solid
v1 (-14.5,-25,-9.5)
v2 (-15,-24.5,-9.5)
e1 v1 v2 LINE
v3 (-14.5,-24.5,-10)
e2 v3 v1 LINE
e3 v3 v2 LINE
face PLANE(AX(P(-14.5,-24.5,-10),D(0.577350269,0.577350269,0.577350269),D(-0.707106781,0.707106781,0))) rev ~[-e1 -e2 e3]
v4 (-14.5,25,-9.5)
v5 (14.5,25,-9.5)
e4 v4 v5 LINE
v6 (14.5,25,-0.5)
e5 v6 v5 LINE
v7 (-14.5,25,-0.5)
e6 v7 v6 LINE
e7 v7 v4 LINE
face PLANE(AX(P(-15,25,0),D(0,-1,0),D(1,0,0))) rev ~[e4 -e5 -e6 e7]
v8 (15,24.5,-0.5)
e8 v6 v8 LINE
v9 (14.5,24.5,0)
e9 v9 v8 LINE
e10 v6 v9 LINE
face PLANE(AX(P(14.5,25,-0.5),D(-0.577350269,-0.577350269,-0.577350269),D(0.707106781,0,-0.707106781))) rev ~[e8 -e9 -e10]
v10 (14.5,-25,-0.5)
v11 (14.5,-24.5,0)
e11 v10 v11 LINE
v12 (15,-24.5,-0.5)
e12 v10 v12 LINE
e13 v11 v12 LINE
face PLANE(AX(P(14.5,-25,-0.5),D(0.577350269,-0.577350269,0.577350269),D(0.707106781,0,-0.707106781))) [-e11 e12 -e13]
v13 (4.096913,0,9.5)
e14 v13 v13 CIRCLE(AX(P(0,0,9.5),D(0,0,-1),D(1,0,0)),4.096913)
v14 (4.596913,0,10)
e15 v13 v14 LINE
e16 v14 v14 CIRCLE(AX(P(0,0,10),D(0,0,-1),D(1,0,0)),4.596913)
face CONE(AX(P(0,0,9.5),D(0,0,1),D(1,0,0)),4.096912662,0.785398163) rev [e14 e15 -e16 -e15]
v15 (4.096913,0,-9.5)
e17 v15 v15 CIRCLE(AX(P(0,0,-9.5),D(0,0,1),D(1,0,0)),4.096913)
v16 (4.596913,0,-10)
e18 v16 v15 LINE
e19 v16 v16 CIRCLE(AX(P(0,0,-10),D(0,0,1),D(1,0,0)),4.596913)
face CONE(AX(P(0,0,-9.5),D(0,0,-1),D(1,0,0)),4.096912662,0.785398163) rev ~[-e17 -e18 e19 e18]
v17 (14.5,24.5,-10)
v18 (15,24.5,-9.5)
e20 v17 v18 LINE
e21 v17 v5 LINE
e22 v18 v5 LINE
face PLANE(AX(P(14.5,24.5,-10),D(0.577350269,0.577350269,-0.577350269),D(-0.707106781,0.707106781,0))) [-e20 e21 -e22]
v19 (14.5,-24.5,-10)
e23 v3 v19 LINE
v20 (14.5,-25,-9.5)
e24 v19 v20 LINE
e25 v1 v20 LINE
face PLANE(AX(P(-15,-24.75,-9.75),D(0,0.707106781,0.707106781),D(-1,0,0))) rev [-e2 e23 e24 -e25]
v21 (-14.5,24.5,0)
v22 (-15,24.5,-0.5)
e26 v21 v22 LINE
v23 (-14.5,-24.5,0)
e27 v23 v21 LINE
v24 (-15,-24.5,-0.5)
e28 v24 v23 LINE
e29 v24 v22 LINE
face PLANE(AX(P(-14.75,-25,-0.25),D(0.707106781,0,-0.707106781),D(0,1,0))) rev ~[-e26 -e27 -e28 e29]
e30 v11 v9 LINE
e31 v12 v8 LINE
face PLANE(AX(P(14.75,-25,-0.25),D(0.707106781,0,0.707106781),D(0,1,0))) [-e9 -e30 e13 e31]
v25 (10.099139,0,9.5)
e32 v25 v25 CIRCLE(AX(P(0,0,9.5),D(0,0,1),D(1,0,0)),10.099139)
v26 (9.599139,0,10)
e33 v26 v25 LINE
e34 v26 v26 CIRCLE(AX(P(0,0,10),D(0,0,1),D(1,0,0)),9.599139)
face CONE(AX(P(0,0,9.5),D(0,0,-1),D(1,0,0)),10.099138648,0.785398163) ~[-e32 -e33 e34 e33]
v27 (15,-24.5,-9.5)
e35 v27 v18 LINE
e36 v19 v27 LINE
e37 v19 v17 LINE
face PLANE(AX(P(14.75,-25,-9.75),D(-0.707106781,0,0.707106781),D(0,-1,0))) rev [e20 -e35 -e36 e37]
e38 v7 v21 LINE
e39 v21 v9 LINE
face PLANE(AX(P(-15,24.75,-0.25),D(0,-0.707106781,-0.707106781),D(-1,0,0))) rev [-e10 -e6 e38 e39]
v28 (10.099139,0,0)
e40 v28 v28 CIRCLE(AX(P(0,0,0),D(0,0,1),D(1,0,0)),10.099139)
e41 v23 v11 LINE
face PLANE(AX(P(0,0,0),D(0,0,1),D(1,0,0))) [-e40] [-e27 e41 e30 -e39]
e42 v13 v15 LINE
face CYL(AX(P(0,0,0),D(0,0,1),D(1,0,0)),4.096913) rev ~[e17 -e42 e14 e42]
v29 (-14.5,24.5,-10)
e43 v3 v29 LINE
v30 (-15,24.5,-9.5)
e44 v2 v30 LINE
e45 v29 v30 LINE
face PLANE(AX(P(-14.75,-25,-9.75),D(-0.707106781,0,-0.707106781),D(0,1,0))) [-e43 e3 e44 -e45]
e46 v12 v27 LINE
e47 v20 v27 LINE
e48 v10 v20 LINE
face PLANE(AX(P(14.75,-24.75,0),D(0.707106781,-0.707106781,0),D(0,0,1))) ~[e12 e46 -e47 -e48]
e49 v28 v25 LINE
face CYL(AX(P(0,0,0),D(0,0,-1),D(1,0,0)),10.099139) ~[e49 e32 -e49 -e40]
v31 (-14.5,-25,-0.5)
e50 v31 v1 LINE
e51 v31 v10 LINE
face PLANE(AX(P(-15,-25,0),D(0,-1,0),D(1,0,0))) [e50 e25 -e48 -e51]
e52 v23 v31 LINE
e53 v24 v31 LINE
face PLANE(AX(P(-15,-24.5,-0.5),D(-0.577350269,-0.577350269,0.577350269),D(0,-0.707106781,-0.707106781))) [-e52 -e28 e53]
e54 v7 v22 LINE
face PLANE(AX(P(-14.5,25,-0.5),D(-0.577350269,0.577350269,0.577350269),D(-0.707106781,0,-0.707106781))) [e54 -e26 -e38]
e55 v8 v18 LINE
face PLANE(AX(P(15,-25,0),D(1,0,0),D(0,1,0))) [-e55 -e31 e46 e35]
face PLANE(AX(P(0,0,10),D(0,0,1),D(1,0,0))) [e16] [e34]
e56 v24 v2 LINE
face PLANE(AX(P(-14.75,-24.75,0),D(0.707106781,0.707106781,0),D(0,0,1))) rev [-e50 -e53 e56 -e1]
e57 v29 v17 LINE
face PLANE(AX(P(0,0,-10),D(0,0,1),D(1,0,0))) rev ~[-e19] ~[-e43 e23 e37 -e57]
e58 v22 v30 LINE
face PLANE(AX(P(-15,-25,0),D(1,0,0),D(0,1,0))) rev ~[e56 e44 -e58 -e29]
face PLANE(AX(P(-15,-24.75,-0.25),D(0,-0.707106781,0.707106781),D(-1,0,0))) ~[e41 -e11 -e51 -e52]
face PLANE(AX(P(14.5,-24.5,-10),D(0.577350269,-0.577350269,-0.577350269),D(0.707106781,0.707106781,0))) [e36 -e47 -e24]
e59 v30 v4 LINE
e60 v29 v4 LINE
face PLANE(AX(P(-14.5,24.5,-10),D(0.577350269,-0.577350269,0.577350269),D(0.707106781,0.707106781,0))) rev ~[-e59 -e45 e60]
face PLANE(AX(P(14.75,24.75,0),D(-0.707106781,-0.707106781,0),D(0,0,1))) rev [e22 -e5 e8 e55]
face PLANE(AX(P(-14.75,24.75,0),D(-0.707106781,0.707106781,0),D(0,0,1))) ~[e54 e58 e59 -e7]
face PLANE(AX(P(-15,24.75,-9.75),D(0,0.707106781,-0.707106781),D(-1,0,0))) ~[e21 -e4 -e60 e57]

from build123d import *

# Parameters (mm, degrees)
F0_W          = 30
F0_H          = 50
F1_DEPTH      = 10
F2_R          = 10.0991386475
F3_DEPTH      = 10
F4_R          = 4.0969126616
F5_DEPTH      = 25
F5_DEPTH_BACK = 25
F6_SIZE       = 0.5
F7_SIZE       = 0.5


# Not quite as in the source:
# - a feature names something its author has since deleted; it is built from what else it names


with BuildPart() as f1:
    # F0 (on Top) → F1 (new body)
    with BuildSketch(Plane.XY):
        Rectangle(F0_W, F0_H)
    extrude(amount=-F1_DEPTH)

    # F2 (on Top) → F3 (join)
    with BuildSketch(Plane.XY):
        Circle(F2_R)
    extrude(amount=F3_DEPTH)

    # F4 (on Top) → F5 (cut, two sides)
    with BuildSketch(Plane.XY) as f5_sk:
        Circle(F4_R)
    extrude(amount=-F5_DEPTH, mode=Mode.SUBTRACT)
    extrude(f5_sk.sketch, amount=F5_DEPTH_BACK, mode=Mode.SUBTRACT)

    # F6
    f6_edges = [f1.edges().sort_by_distance(p)[0] for p in [
        (15, 0, 0),
        (0, -25, 0),
        (-15, 0, 0),
        (0, 25, 0),
        (-10.099139, 0, 10),
        (-4.096913, 0, 10),
        (15, -25, -5),
        (15, 25, -5),
        (-15, -25, -5),
        (0, -25, -10),
        (15, 0, -10),
        (-15, 25, -5),
        (-15, 0, -10),
        (0, 25, -10),
    ]]
    chamfer(f6_edges, length=F6_SIZE)

    # F7
    f7_edges = [f1.edges().sort_by_distance(p)[0] for p in [
        (-4.096913, 0, -10),
    ]]
    chamfer(f7_edges, length=F7_SIZE)


solid = f1.part
